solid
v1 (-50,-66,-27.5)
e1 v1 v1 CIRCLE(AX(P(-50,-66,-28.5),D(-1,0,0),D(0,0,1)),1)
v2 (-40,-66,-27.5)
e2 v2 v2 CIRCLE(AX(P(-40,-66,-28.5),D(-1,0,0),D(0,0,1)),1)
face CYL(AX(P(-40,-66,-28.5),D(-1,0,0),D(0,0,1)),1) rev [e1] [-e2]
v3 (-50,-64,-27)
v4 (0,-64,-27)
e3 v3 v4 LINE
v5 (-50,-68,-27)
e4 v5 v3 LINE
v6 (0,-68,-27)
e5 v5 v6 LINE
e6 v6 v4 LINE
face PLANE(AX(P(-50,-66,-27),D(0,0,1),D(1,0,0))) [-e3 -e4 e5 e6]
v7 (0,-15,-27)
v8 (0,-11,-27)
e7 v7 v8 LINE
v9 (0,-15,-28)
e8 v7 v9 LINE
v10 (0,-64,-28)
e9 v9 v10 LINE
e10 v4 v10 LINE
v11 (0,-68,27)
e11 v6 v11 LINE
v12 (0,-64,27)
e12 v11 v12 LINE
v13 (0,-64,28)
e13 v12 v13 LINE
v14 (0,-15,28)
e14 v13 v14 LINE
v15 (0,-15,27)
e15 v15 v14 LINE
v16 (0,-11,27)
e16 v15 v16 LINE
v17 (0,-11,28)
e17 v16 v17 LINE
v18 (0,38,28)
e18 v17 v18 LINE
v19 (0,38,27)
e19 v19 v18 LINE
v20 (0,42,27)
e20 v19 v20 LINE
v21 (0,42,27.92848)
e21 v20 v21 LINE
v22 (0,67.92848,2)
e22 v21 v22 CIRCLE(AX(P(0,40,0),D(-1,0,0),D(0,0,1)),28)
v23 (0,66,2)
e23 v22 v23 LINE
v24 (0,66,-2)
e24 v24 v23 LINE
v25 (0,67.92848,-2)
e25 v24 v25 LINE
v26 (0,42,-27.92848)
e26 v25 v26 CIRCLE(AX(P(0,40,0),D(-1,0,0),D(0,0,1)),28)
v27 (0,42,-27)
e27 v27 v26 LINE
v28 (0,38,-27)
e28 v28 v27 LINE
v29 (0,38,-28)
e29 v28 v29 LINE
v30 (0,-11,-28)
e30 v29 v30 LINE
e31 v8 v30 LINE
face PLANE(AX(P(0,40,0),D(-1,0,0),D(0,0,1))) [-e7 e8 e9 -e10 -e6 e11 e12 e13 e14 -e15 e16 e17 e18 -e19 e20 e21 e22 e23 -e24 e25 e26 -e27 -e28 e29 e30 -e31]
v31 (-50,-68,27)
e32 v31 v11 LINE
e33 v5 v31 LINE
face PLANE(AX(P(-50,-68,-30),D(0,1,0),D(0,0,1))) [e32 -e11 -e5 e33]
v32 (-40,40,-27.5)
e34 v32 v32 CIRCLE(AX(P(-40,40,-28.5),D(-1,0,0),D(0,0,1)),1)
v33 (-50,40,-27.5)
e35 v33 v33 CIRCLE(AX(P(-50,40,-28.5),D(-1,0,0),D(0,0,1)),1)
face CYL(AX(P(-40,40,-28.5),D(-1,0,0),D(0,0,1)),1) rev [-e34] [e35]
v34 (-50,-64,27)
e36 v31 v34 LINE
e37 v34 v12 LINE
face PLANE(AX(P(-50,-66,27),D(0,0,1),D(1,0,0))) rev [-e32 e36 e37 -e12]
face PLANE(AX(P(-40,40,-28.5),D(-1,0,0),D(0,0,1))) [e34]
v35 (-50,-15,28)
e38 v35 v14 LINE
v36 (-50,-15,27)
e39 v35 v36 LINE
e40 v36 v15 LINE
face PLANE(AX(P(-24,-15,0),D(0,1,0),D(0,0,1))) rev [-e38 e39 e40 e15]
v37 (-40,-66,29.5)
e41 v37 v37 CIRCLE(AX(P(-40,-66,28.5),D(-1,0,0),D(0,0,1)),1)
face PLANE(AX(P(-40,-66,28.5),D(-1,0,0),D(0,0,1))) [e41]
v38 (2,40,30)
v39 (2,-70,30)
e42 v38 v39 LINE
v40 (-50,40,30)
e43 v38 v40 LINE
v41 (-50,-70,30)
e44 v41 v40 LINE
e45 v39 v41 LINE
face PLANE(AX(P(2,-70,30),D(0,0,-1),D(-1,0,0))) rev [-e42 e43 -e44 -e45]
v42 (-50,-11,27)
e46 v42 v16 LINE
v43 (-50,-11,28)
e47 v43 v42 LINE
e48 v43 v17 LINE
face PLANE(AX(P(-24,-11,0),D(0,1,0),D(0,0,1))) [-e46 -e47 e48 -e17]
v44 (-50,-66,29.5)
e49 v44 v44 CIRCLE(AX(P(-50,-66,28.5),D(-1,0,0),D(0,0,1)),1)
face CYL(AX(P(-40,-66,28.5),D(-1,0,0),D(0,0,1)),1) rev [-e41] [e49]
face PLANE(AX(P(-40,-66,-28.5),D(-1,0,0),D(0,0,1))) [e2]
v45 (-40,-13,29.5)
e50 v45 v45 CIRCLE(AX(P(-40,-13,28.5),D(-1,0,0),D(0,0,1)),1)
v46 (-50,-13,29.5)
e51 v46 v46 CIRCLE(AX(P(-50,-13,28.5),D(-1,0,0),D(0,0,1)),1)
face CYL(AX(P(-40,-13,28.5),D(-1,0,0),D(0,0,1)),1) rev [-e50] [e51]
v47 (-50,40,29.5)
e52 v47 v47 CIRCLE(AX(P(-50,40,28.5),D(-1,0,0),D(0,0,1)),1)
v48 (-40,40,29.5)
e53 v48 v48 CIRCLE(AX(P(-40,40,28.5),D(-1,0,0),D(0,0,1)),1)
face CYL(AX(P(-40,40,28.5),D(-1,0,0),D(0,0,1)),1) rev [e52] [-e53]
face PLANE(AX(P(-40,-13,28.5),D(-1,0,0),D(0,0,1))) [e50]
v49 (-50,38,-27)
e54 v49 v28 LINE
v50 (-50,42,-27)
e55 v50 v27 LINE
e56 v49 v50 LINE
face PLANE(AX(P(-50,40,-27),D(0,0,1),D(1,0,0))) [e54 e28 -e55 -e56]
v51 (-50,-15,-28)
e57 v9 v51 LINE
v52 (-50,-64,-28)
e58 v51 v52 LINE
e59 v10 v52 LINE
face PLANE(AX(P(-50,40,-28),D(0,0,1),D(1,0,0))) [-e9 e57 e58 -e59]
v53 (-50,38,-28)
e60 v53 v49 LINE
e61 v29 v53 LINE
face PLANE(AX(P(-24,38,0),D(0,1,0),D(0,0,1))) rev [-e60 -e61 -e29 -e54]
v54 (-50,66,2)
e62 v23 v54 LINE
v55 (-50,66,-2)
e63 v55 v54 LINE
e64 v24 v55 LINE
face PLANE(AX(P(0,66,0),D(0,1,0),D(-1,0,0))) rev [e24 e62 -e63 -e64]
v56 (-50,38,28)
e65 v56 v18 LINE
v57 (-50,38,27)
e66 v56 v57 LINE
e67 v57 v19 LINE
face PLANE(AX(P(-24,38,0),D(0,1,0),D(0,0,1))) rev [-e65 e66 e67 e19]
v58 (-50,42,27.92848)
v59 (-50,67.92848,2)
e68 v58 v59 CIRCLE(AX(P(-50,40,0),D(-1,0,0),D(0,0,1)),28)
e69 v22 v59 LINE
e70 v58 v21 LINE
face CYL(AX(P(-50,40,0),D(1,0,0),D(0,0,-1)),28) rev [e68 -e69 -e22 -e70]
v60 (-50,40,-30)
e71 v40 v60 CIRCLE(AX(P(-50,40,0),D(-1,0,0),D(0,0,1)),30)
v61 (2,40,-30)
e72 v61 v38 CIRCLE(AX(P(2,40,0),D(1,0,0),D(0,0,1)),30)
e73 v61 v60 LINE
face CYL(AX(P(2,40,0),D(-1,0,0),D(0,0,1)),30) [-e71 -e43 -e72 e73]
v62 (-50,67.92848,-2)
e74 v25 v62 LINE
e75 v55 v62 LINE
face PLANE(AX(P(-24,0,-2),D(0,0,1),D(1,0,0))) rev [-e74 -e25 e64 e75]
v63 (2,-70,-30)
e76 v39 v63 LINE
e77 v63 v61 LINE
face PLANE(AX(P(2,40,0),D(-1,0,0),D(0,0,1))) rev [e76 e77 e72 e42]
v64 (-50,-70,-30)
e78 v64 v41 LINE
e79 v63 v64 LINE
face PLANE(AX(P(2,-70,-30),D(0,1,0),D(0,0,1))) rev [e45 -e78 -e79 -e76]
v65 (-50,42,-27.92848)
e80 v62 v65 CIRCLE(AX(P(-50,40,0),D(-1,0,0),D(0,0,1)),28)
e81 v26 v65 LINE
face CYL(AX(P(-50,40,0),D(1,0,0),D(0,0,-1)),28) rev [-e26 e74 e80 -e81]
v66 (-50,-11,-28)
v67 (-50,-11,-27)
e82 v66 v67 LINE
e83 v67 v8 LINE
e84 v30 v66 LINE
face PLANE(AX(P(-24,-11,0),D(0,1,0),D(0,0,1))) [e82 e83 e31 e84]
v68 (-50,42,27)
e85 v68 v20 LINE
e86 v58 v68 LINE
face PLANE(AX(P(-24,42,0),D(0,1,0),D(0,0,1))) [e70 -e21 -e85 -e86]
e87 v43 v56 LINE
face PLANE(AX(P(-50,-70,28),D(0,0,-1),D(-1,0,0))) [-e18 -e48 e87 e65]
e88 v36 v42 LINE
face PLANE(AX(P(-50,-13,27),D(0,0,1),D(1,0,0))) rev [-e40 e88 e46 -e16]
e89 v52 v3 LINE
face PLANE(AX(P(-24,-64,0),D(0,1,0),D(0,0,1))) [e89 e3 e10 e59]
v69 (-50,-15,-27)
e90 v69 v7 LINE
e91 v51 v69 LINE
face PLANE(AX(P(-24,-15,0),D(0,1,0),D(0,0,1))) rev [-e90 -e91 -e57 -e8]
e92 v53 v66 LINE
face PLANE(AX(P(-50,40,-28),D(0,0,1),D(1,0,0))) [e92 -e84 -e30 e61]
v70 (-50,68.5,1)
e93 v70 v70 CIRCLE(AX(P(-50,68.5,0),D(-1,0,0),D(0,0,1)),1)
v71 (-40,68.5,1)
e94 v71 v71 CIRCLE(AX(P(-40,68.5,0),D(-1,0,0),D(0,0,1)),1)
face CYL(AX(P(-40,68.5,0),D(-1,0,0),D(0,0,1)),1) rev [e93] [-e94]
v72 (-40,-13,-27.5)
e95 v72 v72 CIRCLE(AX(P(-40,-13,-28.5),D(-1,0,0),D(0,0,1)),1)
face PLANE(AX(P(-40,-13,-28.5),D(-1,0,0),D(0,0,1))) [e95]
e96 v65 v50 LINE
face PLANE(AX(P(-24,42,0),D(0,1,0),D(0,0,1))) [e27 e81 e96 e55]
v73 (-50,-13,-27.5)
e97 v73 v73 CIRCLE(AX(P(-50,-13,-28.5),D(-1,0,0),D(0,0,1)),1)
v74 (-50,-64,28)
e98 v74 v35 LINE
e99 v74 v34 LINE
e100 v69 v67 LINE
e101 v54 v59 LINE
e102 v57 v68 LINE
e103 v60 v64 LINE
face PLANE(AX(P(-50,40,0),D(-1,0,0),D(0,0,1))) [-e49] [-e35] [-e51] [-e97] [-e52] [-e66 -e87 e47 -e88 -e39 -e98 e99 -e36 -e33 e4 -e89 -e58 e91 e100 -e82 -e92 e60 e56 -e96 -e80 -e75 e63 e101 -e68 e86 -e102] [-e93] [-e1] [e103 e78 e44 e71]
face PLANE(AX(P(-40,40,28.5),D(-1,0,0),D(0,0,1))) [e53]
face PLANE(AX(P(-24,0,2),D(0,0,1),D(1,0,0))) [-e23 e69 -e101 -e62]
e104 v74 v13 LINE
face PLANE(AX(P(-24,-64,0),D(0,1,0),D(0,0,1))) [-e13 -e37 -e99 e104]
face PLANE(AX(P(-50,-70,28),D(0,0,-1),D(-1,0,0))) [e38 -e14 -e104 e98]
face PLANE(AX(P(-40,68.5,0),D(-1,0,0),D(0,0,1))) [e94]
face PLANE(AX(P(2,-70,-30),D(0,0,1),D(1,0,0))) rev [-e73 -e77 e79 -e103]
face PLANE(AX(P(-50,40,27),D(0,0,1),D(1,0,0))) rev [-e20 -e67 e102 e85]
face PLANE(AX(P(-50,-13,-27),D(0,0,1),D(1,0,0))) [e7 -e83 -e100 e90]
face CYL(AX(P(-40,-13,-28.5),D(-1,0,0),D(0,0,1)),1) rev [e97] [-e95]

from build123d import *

# Parameters (mm, degrees)
BOSS_EXTRUDE1_DEPTH     = 2
EXTRUDE_THIN2_START     = 50
EXTRUDE_THIN2_DEPTH     = 50
RIB2_START              = -2
RIB2_OUTLINE_W          = 51
RIB2_OUTLINE_H          = 3
RIB2_DEPTH              = 4
RIB14_START             = -2
RIB14_OUTLINE_W         = 50
RIB14_OUTLINE_H         = 1
RIB14_DEPTH             = 4
LPATTERN1_COUNT         = 3
LPATTERN1_PITCH         = 53
MIRROR1_START           = -2
MIRROR1_COPY_1_SKETCH_W = 50
MIRROR1_COPY_1_SKETCH_H = 1
MIRROR1_COPY_1_DEPTH    = 4
MIRROR1_COPY_2_SKETCH_W = 50
MIRROR1_COPY_2_SKETCH_H = 1
MIRROR1_COPY_2_DEPTH    = 4
SKETCH6_R               = 1
CUT_EXTRUDE1_DEPTH      = 10


# Read off the part's stored shape, not the designer's step: Rib2, Rib14
with BuildPart() as part:
    # Sketch2 → Boss-Extrude1 (new body)
    with BuildSketch(Plane(origin=(0, 0, 0), x_dir=(0, 0, -1), z_dir=(1, 0, 0))):
        with BuildLine():
            Line((30, -70), (-30, -70))
            Line((-30, -70), (-30, 40))
            ThreePointArc((-30, 40), (0, 70), (30, 40))
            Line((30, 40), (30, -70))
        make_face()
    extrude(amount=BOSS_EXTRUDE1_DEPTH)

    # Sketch5 → Extrude-Thin2 (add)
    with BuildSketch(Plane.ZY.offset(EXTRUDE_THIN2_START)):
        with BuildLine():
            Line((-30, 40), (-30, -70))
            Line((-30, -70), (30, -70))
            Line((30, -70), (30, 40))
            ThreePointArc((30, 40), (0, 70), (-30, 40))
        make_face()
        with BuildLine():
            Line((-28, 40), (-28, -68))
            Line((-28, -68), (28, -68))
            Line((28, -68), (28, 40))
            ThreePointArc((28, 40), (0, 68), (-28, 40))
        make_face(mode=Mode.SUBTRACT)
    extrude(amount=-EXTRUDE_THIN2_DEPTH)

    # Rib2 outline → Rib2 (add)
    with BuildSketch(Plane.XY.offset(RIB2_START)):
        with Locations((-24.5, 67.5)):
            Rectangle(RIB2_OUTLINE_W, RIB2_OUTLINE_H)
    extrude(amount=RIB2_DEPTH)

    # Rib14 outline → Rib14 (add)
    with BuildSketch(Plane(origin=(0, 40, 0), x_dir=(1, 0, 0), z_dir=(0, 1, 0)).offset(RIB14_START)):
        with Locations((-25, 27.5)):
            Rectangle(RIB14_OUTLINE_W, RIB14_OUTLINE_H)
    rib14 = extrude(amount=RIB14_DEPTH)

    # LPattern1: Rib14 ×3
    with Locations(*[(0, -i * LPATTERN1_PITCH, 0) for i in range(1, LPATTERN1_COUNT)]):
        add(rib14)

    # Mirror1: Rib14 across plane
    add(rib14.mirror(Plane.XY))

    # Mirror1 copy 1 sketch → Mirror1 copy 1 (add)
    with BuildSketch(Plane(origin=(0, -13, 0), x_dir=(1, 0, 0), z_dir=(0, 1, 0)).offset(MIRROR1_START)):
        with Locations((-25, -27.5)):
            Rectangle(MIRROR1_COPY_1_SKETCH_W, MIRROR1_COPY_1_SKETCH_H)
    extrude(amount=MIRROR1_COPY_1_DEPTH)

    # Mirror1 copy 2 sketch → Mirror1 copy 2 (add)
    with BuildSketch(Plane(origin=(0, -66, 0), x_dir=(1, 0, 0), z_dir=(0, 1, 0)).offset(MIRROR1_START)):
        with Locations((-25, -27.5)):
            Rectangle(MIRROR1_COPY_2_SKETCH_W, MIRROR1_COPY_2_SKETCH_H)
    extrude(amount=MIRROR1_COPY_2_DEPTH)

    # Sketch6 → Cut-Extrude1 (cut)
    with BuildSketch(Plane.ZY.offset(50)):
        with Locations((0, 68.5)):
            Circle(SKETCH6_R)
        with Locations((-28.5, 40)):
            Circle(SKETCH6_R)
        with Locations((28.5, 40)):
            Circle(SKETCH6_R)
        with Locations((28.5, -13)):
            Circle(SKETCH6_R)
        with Locations((28.5, -66)):
            Circle(SKETCH6_R)
        with Locations((-28.5, -13)):
            Circle(SKETCH6_R)
        with Locations((-28.5, -66)):
            Circle(SKETCH6_R)
    extrude(amount=-CUT_EXTRUDE1_DEPTH, mode=Mode.SUBTRACT)


solid = part.part
